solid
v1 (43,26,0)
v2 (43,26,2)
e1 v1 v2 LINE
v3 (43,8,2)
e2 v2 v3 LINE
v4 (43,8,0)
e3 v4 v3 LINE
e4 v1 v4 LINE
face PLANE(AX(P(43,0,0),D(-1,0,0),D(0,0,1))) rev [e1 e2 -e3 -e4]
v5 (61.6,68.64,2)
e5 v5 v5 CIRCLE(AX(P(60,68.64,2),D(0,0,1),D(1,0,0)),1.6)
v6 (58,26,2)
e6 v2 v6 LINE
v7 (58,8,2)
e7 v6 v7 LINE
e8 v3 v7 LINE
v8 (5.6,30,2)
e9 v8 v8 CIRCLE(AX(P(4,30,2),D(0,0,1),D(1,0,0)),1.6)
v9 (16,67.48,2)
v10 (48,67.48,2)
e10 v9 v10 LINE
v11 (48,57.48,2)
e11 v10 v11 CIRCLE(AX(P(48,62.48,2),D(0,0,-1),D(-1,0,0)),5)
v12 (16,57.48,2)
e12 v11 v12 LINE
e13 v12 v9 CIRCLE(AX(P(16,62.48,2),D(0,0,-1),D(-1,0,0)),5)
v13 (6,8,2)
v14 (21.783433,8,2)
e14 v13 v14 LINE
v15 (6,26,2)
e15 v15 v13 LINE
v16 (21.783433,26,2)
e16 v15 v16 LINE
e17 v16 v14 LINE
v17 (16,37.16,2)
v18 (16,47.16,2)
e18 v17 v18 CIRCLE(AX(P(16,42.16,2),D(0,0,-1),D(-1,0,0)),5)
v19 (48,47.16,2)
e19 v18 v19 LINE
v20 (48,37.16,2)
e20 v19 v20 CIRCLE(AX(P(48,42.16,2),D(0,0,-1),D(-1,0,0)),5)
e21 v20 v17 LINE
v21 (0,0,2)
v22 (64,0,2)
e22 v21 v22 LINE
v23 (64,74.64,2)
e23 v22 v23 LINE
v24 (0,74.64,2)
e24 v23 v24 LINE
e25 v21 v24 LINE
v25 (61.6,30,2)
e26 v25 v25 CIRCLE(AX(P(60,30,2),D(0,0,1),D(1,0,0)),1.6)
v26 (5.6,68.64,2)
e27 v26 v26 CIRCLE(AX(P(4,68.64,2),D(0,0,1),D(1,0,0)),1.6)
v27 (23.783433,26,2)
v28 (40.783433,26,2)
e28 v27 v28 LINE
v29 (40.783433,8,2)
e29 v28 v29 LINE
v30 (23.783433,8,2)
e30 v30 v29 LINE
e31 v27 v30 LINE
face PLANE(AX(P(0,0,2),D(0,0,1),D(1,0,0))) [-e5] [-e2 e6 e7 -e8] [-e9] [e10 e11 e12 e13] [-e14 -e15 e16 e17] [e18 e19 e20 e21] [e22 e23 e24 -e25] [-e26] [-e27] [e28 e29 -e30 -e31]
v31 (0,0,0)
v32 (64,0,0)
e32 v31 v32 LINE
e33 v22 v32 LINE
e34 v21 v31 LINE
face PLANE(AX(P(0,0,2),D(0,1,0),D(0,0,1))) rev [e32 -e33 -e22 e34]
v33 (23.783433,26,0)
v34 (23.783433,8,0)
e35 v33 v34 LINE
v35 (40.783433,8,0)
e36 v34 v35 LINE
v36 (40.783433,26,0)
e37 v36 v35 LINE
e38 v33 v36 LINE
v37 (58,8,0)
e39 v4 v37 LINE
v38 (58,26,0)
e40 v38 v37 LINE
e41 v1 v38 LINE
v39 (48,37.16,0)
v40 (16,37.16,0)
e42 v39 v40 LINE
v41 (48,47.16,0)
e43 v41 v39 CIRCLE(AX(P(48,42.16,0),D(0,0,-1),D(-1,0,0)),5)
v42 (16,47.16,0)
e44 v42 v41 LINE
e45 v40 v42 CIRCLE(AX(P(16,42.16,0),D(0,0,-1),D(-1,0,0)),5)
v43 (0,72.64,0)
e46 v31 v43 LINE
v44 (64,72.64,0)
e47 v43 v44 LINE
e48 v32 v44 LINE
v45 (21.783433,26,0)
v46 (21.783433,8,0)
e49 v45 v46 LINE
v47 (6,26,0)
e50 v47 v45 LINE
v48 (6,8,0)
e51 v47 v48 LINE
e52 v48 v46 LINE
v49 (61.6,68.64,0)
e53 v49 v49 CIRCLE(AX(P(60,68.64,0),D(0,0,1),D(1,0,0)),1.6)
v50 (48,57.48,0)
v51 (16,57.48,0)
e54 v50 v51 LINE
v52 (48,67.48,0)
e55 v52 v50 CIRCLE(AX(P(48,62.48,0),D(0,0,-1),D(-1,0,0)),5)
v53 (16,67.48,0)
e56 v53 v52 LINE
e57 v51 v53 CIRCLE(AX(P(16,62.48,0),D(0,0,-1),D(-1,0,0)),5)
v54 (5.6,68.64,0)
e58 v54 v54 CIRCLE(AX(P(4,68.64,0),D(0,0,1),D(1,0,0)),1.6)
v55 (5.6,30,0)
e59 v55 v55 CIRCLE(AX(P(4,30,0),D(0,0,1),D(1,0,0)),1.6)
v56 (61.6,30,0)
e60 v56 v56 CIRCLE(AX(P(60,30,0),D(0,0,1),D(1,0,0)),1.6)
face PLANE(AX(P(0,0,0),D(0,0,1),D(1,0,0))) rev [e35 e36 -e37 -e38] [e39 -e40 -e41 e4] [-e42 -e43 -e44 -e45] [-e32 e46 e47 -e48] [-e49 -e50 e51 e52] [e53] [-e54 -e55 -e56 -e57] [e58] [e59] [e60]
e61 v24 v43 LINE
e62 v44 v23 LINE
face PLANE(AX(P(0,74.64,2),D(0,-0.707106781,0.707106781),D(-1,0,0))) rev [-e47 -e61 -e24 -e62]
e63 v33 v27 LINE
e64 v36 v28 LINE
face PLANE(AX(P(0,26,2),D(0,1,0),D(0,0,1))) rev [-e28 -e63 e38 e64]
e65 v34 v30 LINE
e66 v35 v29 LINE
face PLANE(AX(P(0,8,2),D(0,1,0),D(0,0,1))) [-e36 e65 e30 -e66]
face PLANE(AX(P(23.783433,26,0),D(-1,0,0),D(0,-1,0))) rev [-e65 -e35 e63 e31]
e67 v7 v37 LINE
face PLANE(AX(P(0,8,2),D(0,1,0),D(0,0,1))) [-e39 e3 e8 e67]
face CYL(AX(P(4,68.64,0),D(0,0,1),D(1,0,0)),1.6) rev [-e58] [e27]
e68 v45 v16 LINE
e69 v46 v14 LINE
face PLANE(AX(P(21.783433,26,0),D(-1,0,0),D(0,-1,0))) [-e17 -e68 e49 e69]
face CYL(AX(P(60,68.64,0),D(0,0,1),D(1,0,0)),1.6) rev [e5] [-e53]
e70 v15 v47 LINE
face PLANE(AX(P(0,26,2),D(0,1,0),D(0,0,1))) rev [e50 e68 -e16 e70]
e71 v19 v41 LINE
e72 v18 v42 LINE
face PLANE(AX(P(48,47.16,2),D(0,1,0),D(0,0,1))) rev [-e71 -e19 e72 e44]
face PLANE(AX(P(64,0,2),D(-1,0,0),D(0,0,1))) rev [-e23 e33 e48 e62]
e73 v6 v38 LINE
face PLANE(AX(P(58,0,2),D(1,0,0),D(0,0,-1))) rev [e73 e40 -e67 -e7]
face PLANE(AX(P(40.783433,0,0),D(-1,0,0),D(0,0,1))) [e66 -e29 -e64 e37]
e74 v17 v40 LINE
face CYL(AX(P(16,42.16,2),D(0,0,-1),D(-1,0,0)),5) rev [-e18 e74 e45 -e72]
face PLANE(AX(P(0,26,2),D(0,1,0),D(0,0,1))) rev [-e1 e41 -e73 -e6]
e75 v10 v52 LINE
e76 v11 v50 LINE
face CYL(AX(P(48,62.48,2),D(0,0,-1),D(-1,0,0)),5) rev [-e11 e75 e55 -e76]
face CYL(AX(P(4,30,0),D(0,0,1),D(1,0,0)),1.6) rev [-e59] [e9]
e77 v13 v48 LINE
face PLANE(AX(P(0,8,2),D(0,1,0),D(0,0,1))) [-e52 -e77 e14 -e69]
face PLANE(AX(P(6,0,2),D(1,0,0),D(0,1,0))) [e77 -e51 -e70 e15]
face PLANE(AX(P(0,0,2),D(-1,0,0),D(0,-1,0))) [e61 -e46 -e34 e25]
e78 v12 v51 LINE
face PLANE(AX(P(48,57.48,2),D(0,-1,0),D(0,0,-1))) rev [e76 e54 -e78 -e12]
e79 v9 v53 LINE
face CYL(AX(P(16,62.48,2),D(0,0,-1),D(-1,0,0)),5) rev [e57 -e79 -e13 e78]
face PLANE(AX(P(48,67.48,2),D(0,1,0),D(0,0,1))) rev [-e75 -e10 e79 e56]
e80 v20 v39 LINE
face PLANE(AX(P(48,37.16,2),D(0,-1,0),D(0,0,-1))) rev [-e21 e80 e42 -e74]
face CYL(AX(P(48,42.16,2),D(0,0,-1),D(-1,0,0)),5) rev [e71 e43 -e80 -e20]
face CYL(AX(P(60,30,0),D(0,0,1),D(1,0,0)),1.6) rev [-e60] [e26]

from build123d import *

# Parameters (mm, degrees)
SZKIC1_W                    = 64
SZKIC1_H                    = 72.64
SZKIC1_W_2                  = 52
SZKIC1_H_2                  = 18
SZKIC1_H_3                  = 2
DODANIE_WYCI_GNI_CIE1_DEPTH = 2
SFAZOWANIE1_SIZE            = 2
SZKIC2_R                    = 1.6
WYTNIJ_WYCI_GNI_CIE1_DEPTH  = 2
SZKIC3_W                    = 2.216566571
SZKIC3_H                    = 18
SZKIC3_W_2                  = 2
DODANIE_WYCI_GNI_CIE2_DEPTH = 2
WYTNIJ_WYCI_GNI_CIE2_DEPTH  = 2


with BuildPart() as part:
    # Szkic1 → Dodanie-wyciągnięcie1 (new body)
    # profile 1 of 2: a face of its own
    with BuildSketch(Plane.XY):
        with Locations((32, 36.32)):
            Rectangle(SZKIC1_W, SZKIC1_H)
        with Locations((32, 17)):
            Rectangle(SZKIC1_W_2, SZKIC1_H_2, mode=Mode.SUBTRACT)
    # profile 2 of 2: a face of its own
    with BuildSketch(Plane.XY):
        with Locations((32, 73.64)):
            Rectangle(SZKIC1_W, SZKIC1_H_3)
    extrude(amount=DODANIE_WYCI_GNI_CIE1_DEPTH)

    # Sfazowanie1
    sfazowanie1_edges = [part.edges().sort_by_distance(p)[0] for p in [
        (32, 74.64, 0),
    ]]
    chamfer(sfazowanie1_edges, length=SFAZOWANIE1_SIZE - 0.0001)  # a hair under: the kernel refuses the full size

    # Szkic2 → Wytnij-wyciągnięcie1 (cut)
    with BuildSketch(Plane.XY.offset(2)):
        with Locations((4, 30)):
            Circle(SZKIC2_R)
        with Locations((60, 30)):
            Circle(SZKIC2_R)
        with Locations((4, 68.64)):
            Circle(SZKIC2_R)
        with Locations((60, 68.64)):
            Circle(SZKIC2_R)
    extrude(amount=-WYTNIJ_WYCI_GNI_CIE1_DEPTH, mode=Mode.SUBTRACT)

    # Szkic3 → Dodanie-wyciągnięcie2 (add)
    with BuildSketch(Plane.XY.offset(2)):
        with Locations((41.891716715, 17)):
            Rectangle(SZKIC3_W, SZKIC3_H)
        with Locations((22.783433429, 17)):
            Rectangle(SZKIC3_W_2, SZKIC3_H)
    extrude(amount=-DODANIE_WYCI_GNI_CIE2_DEPTH)

    # Szkic4 → Wytnij-wyciągnięcie2 (cut)
    with BuildSketch(Plane(origin=(0, 0, 0), x_dir=(-1, 0, 0), z_dir=(0, 0, -1))):
        with BuildLine():
            Line((-48, 47.16), (-16, 47.16))
            ThreePointArc((-16, 47.16), (-11, 42.16), (-16, 37.16))
            Line((-16, 37.16), (-48, 37.16))
            ThreePointArc((-48, 37.16), (-53, 42.16), (-48, 47.16))
        make_face()
        with BuildLine():
            Line((-48, 67.48), (-16, 67.48))
            ThreePointArc((-16, 67.48), (-11, 62.48), (-16, 57.48))
            Line((-16, 57.48), (-48, 57.48))
            ThreePointArc((-48, 57.48), (-53, 62.48), (-48, 67.48))
        make_face()
    extrude(amount=-WYTNIJ_WYCI_GNI_CIE2_DEPTH, mode=Mode.SUBTRACT)


solid = part.part
